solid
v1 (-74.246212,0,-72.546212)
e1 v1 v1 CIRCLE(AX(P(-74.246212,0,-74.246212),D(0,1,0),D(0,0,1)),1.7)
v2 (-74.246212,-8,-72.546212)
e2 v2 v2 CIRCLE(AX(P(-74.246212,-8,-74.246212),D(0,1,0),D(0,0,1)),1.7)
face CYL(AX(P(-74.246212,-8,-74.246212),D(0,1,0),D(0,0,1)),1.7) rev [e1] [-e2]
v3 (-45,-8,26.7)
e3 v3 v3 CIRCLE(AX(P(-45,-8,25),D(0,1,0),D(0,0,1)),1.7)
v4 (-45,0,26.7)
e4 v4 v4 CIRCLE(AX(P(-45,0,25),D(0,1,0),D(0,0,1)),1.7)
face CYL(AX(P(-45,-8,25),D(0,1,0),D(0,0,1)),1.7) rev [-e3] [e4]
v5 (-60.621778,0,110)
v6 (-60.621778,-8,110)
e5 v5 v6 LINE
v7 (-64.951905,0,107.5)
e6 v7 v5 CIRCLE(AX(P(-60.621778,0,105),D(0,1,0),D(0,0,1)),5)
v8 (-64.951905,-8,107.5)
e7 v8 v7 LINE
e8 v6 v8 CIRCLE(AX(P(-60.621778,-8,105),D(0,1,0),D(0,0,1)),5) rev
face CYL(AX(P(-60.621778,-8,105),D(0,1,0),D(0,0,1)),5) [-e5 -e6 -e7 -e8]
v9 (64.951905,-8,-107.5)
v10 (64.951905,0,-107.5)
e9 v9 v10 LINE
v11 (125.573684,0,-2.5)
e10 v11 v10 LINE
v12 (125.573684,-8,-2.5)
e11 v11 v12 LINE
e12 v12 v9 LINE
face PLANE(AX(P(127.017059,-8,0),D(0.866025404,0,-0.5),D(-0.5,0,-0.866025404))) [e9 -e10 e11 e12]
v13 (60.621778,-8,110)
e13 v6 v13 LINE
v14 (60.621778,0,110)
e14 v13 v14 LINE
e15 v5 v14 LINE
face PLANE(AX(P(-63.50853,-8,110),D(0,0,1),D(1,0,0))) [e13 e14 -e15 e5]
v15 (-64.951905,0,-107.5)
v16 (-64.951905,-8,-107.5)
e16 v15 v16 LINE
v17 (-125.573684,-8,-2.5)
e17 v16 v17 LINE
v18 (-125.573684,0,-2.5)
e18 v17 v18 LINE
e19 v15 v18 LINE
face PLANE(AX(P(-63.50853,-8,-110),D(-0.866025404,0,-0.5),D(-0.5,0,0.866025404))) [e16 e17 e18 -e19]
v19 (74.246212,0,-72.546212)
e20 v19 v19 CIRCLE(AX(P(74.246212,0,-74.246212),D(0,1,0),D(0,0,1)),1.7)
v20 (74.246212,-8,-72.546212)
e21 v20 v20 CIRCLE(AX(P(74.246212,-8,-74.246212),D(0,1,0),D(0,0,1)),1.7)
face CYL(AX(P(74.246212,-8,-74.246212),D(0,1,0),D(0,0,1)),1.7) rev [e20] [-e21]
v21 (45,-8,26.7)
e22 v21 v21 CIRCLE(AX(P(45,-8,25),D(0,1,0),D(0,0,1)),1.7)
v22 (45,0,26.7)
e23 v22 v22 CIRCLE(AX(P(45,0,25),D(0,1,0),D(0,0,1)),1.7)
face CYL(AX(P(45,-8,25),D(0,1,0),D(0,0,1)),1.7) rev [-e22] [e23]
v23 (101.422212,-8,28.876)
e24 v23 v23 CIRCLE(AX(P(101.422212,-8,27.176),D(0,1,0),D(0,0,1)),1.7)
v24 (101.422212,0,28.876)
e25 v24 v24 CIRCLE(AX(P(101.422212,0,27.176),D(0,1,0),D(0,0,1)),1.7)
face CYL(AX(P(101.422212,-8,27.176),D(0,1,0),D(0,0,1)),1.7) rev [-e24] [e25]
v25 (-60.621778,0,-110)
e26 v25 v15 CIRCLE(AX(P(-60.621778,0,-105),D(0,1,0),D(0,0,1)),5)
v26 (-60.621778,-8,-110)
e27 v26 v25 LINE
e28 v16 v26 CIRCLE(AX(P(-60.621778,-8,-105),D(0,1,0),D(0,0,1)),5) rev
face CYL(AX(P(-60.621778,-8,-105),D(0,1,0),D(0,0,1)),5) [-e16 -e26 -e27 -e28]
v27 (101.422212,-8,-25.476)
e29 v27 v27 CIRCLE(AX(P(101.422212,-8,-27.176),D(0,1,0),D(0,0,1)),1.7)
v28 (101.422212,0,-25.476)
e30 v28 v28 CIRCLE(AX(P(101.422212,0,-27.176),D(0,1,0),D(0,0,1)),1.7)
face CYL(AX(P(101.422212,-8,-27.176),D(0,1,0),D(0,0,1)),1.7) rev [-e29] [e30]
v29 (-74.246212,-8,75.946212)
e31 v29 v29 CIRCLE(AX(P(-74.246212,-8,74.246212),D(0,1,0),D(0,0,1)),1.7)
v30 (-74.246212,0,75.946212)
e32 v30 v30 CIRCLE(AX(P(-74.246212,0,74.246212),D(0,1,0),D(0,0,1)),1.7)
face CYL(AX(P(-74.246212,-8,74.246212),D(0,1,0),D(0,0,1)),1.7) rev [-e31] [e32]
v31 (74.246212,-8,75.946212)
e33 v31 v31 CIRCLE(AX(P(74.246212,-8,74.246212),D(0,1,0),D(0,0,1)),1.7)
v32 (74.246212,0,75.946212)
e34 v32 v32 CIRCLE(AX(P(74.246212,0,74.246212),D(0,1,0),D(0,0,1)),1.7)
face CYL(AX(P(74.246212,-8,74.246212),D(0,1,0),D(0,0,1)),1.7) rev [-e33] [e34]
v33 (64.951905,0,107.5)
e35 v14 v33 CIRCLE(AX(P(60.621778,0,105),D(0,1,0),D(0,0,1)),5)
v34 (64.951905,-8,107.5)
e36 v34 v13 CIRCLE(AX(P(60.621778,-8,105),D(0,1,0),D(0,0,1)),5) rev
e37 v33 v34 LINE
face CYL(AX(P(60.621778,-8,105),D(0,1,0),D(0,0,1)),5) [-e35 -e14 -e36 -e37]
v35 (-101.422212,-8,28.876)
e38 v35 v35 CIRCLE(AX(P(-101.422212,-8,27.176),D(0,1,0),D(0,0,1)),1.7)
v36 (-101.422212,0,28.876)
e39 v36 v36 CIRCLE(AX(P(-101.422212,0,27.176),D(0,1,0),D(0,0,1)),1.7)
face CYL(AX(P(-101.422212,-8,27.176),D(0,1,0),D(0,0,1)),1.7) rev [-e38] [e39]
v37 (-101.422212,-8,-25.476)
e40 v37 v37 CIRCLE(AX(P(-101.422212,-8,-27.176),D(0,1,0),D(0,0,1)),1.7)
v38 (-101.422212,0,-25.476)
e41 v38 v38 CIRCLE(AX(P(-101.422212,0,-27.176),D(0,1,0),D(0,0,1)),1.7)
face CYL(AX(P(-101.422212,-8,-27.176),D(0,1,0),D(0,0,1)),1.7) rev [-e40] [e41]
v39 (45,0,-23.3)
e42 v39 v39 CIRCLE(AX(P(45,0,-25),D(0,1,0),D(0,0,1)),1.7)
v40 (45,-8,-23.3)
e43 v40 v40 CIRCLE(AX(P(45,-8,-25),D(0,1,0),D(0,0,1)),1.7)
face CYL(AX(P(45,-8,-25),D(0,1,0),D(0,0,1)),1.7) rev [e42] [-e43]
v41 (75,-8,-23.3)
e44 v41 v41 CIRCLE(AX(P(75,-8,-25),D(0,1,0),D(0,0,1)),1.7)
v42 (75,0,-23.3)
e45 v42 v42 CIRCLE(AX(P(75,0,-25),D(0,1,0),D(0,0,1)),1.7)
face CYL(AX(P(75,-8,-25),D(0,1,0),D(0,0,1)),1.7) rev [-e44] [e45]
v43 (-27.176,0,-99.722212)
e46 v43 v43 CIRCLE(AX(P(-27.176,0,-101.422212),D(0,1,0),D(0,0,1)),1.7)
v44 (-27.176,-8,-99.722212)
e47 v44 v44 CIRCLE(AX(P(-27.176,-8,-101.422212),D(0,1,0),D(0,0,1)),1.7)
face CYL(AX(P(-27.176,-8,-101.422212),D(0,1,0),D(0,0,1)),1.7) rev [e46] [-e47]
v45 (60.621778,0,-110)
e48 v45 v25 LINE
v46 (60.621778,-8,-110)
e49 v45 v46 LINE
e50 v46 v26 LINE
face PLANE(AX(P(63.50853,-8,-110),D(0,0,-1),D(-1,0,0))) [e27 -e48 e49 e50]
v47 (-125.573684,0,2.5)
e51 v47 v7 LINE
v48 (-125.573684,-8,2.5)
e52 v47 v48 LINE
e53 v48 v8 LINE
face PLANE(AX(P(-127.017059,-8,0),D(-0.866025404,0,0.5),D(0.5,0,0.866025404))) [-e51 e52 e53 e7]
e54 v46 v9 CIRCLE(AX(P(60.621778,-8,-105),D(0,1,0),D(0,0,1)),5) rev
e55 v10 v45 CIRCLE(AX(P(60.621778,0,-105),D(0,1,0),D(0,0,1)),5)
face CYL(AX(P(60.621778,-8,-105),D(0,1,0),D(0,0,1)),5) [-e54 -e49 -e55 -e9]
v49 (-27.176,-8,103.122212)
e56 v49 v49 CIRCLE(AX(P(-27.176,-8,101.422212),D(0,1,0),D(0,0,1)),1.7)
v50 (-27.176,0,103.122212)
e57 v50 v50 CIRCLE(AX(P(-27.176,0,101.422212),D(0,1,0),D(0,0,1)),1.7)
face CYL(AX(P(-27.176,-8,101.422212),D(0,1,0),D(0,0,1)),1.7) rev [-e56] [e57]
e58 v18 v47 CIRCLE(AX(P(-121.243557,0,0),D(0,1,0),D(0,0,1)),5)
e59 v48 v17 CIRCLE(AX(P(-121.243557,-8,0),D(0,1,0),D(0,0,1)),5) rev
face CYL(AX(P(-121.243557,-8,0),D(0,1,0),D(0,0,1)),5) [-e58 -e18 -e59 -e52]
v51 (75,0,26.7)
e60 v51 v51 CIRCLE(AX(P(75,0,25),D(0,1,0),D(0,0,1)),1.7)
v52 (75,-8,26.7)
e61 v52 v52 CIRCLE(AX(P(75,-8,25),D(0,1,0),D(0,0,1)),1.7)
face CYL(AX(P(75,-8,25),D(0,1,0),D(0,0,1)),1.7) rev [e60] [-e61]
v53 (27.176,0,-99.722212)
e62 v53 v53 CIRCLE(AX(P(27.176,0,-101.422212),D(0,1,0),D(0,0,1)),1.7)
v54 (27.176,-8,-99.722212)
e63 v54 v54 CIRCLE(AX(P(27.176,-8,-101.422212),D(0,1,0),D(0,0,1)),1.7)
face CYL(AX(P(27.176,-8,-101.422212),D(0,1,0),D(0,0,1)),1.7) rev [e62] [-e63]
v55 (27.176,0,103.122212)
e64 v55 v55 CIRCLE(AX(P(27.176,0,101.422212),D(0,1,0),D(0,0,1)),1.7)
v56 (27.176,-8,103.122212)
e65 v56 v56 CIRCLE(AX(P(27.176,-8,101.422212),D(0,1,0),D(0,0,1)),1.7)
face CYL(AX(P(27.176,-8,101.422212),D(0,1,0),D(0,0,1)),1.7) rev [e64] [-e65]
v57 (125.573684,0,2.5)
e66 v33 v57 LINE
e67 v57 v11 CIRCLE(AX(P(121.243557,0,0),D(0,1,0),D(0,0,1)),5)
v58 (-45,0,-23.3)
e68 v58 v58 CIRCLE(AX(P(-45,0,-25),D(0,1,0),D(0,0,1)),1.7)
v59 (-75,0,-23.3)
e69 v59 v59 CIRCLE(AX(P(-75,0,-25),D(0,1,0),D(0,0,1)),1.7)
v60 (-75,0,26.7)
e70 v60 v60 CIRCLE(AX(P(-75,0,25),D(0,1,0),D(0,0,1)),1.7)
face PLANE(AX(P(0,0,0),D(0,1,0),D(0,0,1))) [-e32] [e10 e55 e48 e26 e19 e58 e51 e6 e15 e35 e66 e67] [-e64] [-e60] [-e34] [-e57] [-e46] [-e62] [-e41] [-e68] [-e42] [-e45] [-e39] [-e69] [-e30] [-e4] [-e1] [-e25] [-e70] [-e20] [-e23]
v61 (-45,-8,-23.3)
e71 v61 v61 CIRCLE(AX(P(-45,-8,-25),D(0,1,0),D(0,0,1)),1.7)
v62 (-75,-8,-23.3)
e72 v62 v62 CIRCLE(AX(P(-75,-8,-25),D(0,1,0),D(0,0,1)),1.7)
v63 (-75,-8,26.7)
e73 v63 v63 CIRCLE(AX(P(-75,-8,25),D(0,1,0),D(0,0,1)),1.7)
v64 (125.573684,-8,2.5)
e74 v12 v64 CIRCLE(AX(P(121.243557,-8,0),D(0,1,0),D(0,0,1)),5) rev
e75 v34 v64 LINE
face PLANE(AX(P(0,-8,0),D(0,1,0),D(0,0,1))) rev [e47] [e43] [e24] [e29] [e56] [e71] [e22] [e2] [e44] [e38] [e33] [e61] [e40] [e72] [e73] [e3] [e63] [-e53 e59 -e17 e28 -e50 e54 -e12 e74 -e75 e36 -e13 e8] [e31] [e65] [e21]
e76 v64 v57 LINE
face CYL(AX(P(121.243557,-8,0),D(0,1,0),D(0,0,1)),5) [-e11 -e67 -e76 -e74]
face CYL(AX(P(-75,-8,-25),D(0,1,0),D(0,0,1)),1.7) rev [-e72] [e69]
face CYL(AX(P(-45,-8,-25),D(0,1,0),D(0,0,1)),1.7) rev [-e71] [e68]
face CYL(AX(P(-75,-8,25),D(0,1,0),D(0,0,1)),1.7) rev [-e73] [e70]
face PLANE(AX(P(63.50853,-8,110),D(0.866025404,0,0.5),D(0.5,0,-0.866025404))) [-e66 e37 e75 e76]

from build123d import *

# Parameters (mm, degrees)
SKETCH1_R          = 1.7
BASE_FLANGE1_DEPTH = 8
FILLET2_R          = 5


# Sheet-metal steps are written as plain solids
with BuildPart() as part:
    # Sketch1 → Base-Flange1 (new body)
    with BuildSketch(Plane(origin=(0, 0, 0), x_dir=(1, 0, 0), z_dir=(0, 1, 0))):
        Polygon((127.017059222, 0), (63.508529611, 110), (-63.508529611, 110), (-127.017059222, 0), (-63.508529611, -110), (63.508529611, -110), align=None)
        with Locations(Location((-75, 25, 0), (0, 0, 270))):
            Circle(SKETCH1_R, mode=Mode.SUBTRACT)
        with Locations(Location((-75, -25, 0), (0, 0, 270))):
            Circle(SKETCH1_R, mode=Mode.SUBTRACT)
        with Locations(Location((75, 25, 0), (0, 0, 270))):
            Circle(SKETCH1_R, mode=Mode.SUBTRACT)
        with Locations(Location((75, -25, 0), (0, 0, 270))):
            Circle(SKETCH1_R, mode=Mode.SUBTRACT)
        with Locations(Location((-45, 25, 0), (0, 0, 270))):
            Circle(SKETCH1_R, mode=Mode.SUBTRACT)
        with Locations(Location((-45, -25, 0), (0, 0, 270))):
            Circle(SKETCH1_R, mode=Mode.SUBTRACT)
        with Locations(Location((45, 25, 0), (0, 0, 270))):
            Circle(SKETCH1_R, mode=Mode.SUBTRACT)
        with Locations(Location((45, -25, 0), (0, 0, 270))):
            Circle(SKETCH1_R, mode=Mode.SUBTRACT)
        with Locations(Location((-74.246212025, -74.246212025, 0), (0, 0, 270))):
            Circle(SKETCH1_R, mode=Mode.SUBTRACT)
        with Locations(Location((-101.42221176, -27.175999736, 0), (0, 0, 270))):
            Circle(SKETCH1_R, mode=Mode.SUBTRACT)
        with Locations(Location((-101.42221176, 27.175999736, 0), (0, 0, 270))):
            Circle(SKETCH1_R, mode=Mode.SUBTRACT)
        with Locations(Location((-74.246212025, 74.246212025, 0), (0, 0, 270))):
            Circle(SKETCH1_R, mode=Mode.SUBTRACT)
        with Locations(Location((-27.175999736, 101.42221176, 0), (0, 0, 270))):
            Circle(SKETCH1_R, mode=Mode.SUBTRACT)
        with Locations(Location((27.175999736, 101.42221176, 0), (0, 0, 270))):
            Circle(SKETCH1_R, mode=Mode.SUBTRACT)
        with Locations(Location((74.246212025, 74.246212025, 0), (0, 0, 270))):
            Circle(SKETCH1_R, mode=Mode.SUBTRACT)
        with Locations(Location((101.42221176, 27.175999736, 0), (0, 0, 270))):
            Circle(SKETCH1_R, mode=Mode.SUBTRACT)
        with Locations(Location((101.42221176, -27.175999736, 0), (0, 0, 270))):
            Circle(SKETCH1_R, mode=Mode.SUBTRACT)
        with Locations(Location((74.246212025, -74.246212025, 0), (0, 0, 270))):
            Circle(SKETCH1_R, mode=Mode.SUBTRACT)
        with Locations(Location((27.175999736, -101.42221176, 0), (0, 0, 270))):
            Circle(SKETCH1_R, mode=Mode.SUBTRACT)
        with Locations(Location((-27.175999736, -101.42221176, 0), (0, 0, 270))):
            Circle(SKETCH1_R, mode=Mode.SUBTRACT)
    extrude(amount=-BASE_FLANGE1_DEPTH)

    # Fillet2
    fillet2_edges = [part.edges().sort_by_distance(p)[0] for p in [
        (63.508529611, -4, 110),
        (-63.508529611, -4, 110),
        (-127.017059222, -4, 0),
        (-63.508529611, -4, -110),
        (63.508529611, -4, -110),
        (127.017059222, -4, 0),
    ]]
    fillet(fillet2_edges, radius=FILLET2_R)


solid = part.part
